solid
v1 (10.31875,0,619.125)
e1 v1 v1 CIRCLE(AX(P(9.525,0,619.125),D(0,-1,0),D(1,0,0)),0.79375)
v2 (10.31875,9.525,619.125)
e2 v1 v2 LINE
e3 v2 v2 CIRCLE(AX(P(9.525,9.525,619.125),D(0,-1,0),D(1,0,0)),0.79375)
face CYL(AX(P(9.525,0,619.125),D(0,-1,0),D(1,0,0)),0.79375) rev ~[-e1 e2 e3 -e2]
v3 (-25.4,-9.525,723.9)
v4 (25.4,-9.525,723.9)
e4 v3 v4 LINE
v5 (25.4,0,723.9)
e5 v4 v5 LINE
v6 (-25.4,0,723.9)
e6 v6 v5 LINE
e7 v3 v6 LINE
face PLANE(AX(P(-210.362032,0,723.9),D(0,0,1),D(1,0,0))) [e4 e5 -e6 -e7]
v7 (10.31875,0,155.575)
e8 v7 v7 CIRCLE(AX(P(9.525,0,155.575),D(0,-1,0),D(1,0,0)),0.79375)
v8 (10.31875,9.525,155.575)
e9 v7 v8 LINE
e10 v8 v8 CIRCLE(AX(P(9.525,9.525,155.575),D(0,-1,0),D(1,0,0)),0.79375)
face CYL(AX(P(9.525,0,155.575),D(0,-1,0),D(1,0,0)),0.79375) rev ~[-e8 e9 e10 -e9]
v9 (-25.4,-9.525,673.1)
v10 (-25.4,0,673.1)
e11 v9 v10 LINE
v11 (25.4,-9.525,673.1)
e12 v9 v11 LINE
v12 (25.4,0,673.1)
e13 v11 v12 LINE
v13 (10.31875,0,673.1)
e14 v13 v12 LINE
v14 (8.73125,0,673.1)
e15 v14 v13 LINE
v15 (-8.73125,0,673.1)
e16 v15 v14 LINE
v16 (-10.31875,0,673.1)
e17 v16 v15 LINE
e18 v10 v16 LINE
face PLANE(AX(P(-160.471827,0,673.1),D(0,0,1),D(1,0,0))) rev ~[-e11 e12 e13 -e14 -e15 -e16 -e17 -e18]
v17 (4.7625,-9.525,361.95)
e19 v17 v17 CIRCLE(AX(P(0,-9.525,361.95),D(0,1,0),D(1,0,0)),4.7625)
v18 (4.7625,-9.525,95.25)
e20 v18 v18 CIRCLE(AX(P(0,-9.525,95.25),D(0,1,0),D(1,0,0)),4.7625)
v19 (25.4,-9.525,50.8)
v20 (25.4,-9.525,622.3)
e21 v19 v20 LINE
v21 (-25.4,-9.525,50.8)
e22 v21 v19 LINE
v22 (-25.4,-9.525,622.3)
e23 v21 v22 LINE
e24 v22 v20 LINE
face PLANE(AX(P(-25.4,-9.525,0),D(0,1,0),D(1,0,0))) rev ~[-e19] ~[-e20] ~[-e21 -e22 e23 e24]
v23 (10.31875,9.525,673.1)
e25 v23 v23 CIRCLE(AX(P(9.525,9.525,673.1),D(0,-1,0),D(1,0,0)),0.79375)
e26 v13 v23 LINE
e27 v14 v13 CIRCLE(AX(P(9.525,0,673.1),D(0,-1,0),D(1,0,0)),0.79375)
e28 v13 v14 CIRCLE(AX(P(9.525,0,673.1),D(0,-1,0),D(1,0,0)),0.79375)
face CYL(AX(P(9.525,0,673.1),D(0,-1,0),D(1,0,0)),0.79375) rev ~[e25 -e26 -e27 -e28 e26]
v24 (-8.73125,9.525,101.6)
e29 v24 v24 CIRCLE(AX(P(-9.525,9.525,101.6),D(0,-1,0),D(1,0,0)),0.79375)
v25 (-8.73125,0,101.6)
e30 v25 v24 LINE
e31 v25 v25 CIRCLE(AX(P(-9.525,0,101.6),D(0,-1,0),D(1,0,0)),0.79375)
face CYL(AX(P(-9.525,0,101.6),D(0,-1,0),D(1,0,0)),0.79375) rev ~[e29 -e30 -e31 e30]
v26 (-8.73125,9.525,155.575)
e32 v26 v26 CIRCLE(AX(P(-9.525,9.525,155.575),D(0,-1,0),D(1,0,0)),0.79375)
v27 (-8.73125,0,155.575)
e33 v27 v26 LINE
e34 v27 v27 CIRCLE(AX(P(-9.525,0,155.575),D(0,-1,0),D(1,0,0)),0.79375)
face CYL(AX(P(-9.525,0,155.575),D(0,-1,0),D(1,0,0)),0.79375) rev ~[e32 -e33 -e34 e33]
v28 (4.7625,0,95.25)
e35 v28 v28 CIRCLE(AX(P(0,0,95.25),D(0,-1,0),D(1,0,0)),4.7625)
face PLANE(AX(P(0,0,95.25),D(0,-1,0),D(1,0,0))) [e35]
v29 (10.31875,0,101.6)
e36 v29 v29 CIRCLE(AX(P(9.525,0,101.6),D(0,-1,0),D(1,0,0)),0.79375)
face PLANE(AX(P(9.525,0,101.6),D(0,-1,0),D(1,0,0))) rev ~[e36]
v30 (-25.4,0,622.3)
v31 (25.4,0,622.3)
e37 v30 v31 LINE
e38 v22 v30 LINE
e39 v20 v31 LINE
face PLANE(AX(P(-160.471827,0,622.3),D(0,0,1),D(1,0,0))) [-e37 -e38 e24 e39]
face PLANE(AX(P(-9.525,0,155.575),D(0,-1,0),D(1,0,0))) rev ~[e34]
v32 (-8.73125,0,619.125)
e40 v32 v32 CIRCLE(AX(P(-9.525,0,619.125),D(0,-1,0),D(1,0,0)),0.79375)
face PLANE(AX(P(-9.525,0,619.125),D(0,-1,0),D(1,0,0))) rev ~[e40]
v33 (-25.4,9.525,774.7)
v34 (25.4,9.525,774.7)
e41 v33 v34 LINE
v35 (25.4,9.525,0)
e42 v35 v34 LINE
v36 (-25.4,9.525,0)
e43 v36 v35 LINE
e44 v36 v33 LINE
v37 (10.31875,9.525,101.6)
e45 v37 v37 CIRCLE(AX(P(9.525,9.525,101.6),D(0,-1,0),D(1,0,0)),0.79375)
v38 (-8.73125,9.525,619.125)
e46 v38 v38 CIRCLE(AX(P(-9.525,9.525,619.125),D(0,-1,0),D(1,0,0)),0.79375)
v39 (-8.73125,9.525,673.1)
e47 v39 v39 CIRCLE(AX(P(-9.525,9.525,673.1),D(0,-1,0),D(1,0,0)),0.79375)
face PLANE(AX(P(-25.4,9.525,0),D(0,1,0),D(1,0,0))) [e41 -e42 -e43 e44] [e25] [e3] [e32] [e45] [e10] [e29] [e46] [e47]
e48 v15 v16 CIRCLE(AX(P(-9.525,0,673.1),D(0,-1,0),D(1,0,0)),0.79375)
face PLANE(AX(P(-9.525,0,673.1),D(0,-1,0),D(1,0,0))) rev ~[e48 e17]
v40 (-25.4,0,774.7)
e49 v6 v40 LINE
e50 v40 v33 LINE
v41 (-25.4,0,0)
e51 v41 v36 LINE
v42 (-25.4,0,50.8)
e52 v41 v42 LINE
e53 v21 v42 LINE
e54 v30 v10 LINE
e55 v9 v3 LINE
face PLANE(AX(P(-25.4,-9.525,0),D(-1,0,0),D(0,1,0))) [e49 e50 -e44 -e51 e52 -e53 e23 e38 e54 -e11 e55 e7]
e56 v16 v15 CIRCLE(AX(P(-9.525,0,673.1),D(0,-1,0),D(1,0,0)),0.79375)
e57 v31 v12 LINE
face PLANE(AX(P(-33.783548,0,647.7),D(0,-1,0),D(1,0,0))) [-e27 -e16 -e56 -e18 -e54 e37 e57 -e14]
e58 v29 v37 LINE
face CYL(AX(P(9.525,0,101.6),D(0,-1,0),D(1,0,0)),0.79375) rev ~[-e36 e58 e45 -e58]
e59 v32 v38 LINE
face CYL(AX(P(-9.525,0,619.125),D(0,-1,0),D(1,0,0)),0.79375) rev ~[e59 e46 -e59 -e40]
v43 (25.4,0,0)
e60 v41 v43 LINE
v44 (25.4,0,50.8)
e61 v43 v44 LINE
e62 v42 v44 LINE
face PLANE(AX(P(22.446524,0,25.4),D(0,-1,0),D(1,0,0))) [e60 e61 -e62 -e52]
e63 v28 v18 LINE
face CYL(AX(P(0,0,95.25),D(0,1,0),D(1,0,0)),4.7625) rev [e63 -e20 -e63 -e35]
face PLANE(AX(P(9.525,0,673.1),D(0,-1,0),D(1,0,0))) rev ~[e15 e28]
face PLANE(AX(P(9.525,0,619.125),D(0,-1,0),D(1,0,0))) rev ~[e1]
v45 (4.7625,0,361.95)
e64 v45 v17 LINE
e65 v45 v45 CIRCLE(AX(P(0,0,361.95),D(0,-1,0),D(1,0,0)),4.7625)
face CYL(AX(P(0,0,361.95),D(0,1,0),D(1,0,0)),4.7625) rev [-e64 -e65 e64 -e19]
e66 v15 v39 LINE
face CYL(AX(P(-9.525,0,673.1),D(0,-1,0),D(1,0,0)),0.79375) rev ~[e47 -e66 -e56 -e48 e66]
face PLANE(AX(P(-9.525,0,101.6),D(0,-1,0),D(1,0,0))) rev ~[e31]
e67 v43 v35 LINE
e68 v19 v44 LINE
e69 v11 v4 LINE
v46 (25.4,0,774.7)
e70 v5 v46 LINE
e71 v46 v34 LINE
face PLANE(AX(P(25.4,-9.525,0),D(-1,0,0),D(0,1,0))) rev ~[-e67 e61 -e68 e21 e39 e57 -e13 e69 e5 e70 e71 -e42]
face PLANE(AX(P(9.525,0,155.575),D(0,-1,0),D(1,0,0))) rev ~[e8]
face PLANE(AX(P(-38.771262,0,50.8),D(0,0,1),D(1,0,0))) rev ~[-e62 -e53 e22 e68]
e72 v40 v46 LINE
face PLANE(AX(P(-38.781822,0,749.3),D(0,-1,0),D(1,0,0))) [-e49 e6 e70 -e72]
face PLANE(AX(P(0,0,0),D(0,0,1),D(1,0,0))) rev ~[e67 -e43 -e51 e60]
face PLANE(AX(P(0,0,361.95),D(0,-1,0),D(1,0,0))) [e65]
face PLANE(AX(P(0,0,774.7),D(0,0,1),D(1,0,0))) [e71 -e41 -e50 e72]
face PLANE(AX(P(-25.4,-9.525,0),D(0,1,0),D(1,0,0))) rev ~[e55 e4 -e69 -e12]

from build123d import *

# Parameters (mm, degrees)
F0_W     = 50.8
F0_H     = 19.05
F1_DEPTH = 774.7
F2_W     = 122.43557321
F2_H     = 50.8
F2_W_2   = 343.1604206562
F2_W_3   = 253.376558423
F3_DEPTH = 25.4
F4_R     = 0.79375
F5_DEPTH = 25.4
F6_R     = 4.7625
F7_DEPTH = 25.4


# Not quite as in the source:
# - a feature names something its author has since deleted; it is built from what else it names


with BuildPart() as f1:
    # F0 (on Top) → F1 (new body)
    with BuildSketch(Plane.XY):
        Rectangle(F0_W, F0_H)
    extrude(amount=F1_DEPTH)

    # F2 (on Front) → F3 (cut)
    with BuildSketch(Plane.XZ):
        with Locations((22.4465244144, 25.4)):
            Rectangle(F2_W, F2_H)
        with Locations((-38.7818217278, 749.3)):
            Rectangle(F2_W_2, F2_H)
        with Locations((-33.7835475802, 647.7)):
            Rectangle(F2_W_3, F2_H)
    extrude(amount=F3_DEPTH, mode=Mode.SUBTRACT)

    # F4 (on Front) → F5 (cut)
    with BuildSketch(Plane.XZ):
        with Locations((9.525, 101.6)):
            Circle(F4_R)
        with Locations((9.525, 155.575)):
            Circle(F4_R)
        with Locations((9.525, 619.125)):
            Circle(F4_R)
        with Locations((9.525, 673.1)):
            Circle(F4_R)
        with Locations((-9.525, 619.125)):
            Circle(F4_R)
        with Locations((-9.525, 673.1)):
            Circle(F4_R)
        with Locations((-9.525, 101.6)):
            Circle(F4_R)
        with Locations((-9.525, 155.575)):
            Circle(F4_R)
    extrude(amount=-F5_DEPTH, mode=Mode.SUBTRACT)

    # F6 (on Front) → F7 (cut)
    with BuildSketch(Plane.XZ):
        with Locations((0, 95.25)):
            Circle(F6_R)
        with Locations((0, 361.95)):
            Circle(F6_R)
    extrude(amount=F7_DEPTH, mode=Mode.SUBTRACT)


solid = f1.part
